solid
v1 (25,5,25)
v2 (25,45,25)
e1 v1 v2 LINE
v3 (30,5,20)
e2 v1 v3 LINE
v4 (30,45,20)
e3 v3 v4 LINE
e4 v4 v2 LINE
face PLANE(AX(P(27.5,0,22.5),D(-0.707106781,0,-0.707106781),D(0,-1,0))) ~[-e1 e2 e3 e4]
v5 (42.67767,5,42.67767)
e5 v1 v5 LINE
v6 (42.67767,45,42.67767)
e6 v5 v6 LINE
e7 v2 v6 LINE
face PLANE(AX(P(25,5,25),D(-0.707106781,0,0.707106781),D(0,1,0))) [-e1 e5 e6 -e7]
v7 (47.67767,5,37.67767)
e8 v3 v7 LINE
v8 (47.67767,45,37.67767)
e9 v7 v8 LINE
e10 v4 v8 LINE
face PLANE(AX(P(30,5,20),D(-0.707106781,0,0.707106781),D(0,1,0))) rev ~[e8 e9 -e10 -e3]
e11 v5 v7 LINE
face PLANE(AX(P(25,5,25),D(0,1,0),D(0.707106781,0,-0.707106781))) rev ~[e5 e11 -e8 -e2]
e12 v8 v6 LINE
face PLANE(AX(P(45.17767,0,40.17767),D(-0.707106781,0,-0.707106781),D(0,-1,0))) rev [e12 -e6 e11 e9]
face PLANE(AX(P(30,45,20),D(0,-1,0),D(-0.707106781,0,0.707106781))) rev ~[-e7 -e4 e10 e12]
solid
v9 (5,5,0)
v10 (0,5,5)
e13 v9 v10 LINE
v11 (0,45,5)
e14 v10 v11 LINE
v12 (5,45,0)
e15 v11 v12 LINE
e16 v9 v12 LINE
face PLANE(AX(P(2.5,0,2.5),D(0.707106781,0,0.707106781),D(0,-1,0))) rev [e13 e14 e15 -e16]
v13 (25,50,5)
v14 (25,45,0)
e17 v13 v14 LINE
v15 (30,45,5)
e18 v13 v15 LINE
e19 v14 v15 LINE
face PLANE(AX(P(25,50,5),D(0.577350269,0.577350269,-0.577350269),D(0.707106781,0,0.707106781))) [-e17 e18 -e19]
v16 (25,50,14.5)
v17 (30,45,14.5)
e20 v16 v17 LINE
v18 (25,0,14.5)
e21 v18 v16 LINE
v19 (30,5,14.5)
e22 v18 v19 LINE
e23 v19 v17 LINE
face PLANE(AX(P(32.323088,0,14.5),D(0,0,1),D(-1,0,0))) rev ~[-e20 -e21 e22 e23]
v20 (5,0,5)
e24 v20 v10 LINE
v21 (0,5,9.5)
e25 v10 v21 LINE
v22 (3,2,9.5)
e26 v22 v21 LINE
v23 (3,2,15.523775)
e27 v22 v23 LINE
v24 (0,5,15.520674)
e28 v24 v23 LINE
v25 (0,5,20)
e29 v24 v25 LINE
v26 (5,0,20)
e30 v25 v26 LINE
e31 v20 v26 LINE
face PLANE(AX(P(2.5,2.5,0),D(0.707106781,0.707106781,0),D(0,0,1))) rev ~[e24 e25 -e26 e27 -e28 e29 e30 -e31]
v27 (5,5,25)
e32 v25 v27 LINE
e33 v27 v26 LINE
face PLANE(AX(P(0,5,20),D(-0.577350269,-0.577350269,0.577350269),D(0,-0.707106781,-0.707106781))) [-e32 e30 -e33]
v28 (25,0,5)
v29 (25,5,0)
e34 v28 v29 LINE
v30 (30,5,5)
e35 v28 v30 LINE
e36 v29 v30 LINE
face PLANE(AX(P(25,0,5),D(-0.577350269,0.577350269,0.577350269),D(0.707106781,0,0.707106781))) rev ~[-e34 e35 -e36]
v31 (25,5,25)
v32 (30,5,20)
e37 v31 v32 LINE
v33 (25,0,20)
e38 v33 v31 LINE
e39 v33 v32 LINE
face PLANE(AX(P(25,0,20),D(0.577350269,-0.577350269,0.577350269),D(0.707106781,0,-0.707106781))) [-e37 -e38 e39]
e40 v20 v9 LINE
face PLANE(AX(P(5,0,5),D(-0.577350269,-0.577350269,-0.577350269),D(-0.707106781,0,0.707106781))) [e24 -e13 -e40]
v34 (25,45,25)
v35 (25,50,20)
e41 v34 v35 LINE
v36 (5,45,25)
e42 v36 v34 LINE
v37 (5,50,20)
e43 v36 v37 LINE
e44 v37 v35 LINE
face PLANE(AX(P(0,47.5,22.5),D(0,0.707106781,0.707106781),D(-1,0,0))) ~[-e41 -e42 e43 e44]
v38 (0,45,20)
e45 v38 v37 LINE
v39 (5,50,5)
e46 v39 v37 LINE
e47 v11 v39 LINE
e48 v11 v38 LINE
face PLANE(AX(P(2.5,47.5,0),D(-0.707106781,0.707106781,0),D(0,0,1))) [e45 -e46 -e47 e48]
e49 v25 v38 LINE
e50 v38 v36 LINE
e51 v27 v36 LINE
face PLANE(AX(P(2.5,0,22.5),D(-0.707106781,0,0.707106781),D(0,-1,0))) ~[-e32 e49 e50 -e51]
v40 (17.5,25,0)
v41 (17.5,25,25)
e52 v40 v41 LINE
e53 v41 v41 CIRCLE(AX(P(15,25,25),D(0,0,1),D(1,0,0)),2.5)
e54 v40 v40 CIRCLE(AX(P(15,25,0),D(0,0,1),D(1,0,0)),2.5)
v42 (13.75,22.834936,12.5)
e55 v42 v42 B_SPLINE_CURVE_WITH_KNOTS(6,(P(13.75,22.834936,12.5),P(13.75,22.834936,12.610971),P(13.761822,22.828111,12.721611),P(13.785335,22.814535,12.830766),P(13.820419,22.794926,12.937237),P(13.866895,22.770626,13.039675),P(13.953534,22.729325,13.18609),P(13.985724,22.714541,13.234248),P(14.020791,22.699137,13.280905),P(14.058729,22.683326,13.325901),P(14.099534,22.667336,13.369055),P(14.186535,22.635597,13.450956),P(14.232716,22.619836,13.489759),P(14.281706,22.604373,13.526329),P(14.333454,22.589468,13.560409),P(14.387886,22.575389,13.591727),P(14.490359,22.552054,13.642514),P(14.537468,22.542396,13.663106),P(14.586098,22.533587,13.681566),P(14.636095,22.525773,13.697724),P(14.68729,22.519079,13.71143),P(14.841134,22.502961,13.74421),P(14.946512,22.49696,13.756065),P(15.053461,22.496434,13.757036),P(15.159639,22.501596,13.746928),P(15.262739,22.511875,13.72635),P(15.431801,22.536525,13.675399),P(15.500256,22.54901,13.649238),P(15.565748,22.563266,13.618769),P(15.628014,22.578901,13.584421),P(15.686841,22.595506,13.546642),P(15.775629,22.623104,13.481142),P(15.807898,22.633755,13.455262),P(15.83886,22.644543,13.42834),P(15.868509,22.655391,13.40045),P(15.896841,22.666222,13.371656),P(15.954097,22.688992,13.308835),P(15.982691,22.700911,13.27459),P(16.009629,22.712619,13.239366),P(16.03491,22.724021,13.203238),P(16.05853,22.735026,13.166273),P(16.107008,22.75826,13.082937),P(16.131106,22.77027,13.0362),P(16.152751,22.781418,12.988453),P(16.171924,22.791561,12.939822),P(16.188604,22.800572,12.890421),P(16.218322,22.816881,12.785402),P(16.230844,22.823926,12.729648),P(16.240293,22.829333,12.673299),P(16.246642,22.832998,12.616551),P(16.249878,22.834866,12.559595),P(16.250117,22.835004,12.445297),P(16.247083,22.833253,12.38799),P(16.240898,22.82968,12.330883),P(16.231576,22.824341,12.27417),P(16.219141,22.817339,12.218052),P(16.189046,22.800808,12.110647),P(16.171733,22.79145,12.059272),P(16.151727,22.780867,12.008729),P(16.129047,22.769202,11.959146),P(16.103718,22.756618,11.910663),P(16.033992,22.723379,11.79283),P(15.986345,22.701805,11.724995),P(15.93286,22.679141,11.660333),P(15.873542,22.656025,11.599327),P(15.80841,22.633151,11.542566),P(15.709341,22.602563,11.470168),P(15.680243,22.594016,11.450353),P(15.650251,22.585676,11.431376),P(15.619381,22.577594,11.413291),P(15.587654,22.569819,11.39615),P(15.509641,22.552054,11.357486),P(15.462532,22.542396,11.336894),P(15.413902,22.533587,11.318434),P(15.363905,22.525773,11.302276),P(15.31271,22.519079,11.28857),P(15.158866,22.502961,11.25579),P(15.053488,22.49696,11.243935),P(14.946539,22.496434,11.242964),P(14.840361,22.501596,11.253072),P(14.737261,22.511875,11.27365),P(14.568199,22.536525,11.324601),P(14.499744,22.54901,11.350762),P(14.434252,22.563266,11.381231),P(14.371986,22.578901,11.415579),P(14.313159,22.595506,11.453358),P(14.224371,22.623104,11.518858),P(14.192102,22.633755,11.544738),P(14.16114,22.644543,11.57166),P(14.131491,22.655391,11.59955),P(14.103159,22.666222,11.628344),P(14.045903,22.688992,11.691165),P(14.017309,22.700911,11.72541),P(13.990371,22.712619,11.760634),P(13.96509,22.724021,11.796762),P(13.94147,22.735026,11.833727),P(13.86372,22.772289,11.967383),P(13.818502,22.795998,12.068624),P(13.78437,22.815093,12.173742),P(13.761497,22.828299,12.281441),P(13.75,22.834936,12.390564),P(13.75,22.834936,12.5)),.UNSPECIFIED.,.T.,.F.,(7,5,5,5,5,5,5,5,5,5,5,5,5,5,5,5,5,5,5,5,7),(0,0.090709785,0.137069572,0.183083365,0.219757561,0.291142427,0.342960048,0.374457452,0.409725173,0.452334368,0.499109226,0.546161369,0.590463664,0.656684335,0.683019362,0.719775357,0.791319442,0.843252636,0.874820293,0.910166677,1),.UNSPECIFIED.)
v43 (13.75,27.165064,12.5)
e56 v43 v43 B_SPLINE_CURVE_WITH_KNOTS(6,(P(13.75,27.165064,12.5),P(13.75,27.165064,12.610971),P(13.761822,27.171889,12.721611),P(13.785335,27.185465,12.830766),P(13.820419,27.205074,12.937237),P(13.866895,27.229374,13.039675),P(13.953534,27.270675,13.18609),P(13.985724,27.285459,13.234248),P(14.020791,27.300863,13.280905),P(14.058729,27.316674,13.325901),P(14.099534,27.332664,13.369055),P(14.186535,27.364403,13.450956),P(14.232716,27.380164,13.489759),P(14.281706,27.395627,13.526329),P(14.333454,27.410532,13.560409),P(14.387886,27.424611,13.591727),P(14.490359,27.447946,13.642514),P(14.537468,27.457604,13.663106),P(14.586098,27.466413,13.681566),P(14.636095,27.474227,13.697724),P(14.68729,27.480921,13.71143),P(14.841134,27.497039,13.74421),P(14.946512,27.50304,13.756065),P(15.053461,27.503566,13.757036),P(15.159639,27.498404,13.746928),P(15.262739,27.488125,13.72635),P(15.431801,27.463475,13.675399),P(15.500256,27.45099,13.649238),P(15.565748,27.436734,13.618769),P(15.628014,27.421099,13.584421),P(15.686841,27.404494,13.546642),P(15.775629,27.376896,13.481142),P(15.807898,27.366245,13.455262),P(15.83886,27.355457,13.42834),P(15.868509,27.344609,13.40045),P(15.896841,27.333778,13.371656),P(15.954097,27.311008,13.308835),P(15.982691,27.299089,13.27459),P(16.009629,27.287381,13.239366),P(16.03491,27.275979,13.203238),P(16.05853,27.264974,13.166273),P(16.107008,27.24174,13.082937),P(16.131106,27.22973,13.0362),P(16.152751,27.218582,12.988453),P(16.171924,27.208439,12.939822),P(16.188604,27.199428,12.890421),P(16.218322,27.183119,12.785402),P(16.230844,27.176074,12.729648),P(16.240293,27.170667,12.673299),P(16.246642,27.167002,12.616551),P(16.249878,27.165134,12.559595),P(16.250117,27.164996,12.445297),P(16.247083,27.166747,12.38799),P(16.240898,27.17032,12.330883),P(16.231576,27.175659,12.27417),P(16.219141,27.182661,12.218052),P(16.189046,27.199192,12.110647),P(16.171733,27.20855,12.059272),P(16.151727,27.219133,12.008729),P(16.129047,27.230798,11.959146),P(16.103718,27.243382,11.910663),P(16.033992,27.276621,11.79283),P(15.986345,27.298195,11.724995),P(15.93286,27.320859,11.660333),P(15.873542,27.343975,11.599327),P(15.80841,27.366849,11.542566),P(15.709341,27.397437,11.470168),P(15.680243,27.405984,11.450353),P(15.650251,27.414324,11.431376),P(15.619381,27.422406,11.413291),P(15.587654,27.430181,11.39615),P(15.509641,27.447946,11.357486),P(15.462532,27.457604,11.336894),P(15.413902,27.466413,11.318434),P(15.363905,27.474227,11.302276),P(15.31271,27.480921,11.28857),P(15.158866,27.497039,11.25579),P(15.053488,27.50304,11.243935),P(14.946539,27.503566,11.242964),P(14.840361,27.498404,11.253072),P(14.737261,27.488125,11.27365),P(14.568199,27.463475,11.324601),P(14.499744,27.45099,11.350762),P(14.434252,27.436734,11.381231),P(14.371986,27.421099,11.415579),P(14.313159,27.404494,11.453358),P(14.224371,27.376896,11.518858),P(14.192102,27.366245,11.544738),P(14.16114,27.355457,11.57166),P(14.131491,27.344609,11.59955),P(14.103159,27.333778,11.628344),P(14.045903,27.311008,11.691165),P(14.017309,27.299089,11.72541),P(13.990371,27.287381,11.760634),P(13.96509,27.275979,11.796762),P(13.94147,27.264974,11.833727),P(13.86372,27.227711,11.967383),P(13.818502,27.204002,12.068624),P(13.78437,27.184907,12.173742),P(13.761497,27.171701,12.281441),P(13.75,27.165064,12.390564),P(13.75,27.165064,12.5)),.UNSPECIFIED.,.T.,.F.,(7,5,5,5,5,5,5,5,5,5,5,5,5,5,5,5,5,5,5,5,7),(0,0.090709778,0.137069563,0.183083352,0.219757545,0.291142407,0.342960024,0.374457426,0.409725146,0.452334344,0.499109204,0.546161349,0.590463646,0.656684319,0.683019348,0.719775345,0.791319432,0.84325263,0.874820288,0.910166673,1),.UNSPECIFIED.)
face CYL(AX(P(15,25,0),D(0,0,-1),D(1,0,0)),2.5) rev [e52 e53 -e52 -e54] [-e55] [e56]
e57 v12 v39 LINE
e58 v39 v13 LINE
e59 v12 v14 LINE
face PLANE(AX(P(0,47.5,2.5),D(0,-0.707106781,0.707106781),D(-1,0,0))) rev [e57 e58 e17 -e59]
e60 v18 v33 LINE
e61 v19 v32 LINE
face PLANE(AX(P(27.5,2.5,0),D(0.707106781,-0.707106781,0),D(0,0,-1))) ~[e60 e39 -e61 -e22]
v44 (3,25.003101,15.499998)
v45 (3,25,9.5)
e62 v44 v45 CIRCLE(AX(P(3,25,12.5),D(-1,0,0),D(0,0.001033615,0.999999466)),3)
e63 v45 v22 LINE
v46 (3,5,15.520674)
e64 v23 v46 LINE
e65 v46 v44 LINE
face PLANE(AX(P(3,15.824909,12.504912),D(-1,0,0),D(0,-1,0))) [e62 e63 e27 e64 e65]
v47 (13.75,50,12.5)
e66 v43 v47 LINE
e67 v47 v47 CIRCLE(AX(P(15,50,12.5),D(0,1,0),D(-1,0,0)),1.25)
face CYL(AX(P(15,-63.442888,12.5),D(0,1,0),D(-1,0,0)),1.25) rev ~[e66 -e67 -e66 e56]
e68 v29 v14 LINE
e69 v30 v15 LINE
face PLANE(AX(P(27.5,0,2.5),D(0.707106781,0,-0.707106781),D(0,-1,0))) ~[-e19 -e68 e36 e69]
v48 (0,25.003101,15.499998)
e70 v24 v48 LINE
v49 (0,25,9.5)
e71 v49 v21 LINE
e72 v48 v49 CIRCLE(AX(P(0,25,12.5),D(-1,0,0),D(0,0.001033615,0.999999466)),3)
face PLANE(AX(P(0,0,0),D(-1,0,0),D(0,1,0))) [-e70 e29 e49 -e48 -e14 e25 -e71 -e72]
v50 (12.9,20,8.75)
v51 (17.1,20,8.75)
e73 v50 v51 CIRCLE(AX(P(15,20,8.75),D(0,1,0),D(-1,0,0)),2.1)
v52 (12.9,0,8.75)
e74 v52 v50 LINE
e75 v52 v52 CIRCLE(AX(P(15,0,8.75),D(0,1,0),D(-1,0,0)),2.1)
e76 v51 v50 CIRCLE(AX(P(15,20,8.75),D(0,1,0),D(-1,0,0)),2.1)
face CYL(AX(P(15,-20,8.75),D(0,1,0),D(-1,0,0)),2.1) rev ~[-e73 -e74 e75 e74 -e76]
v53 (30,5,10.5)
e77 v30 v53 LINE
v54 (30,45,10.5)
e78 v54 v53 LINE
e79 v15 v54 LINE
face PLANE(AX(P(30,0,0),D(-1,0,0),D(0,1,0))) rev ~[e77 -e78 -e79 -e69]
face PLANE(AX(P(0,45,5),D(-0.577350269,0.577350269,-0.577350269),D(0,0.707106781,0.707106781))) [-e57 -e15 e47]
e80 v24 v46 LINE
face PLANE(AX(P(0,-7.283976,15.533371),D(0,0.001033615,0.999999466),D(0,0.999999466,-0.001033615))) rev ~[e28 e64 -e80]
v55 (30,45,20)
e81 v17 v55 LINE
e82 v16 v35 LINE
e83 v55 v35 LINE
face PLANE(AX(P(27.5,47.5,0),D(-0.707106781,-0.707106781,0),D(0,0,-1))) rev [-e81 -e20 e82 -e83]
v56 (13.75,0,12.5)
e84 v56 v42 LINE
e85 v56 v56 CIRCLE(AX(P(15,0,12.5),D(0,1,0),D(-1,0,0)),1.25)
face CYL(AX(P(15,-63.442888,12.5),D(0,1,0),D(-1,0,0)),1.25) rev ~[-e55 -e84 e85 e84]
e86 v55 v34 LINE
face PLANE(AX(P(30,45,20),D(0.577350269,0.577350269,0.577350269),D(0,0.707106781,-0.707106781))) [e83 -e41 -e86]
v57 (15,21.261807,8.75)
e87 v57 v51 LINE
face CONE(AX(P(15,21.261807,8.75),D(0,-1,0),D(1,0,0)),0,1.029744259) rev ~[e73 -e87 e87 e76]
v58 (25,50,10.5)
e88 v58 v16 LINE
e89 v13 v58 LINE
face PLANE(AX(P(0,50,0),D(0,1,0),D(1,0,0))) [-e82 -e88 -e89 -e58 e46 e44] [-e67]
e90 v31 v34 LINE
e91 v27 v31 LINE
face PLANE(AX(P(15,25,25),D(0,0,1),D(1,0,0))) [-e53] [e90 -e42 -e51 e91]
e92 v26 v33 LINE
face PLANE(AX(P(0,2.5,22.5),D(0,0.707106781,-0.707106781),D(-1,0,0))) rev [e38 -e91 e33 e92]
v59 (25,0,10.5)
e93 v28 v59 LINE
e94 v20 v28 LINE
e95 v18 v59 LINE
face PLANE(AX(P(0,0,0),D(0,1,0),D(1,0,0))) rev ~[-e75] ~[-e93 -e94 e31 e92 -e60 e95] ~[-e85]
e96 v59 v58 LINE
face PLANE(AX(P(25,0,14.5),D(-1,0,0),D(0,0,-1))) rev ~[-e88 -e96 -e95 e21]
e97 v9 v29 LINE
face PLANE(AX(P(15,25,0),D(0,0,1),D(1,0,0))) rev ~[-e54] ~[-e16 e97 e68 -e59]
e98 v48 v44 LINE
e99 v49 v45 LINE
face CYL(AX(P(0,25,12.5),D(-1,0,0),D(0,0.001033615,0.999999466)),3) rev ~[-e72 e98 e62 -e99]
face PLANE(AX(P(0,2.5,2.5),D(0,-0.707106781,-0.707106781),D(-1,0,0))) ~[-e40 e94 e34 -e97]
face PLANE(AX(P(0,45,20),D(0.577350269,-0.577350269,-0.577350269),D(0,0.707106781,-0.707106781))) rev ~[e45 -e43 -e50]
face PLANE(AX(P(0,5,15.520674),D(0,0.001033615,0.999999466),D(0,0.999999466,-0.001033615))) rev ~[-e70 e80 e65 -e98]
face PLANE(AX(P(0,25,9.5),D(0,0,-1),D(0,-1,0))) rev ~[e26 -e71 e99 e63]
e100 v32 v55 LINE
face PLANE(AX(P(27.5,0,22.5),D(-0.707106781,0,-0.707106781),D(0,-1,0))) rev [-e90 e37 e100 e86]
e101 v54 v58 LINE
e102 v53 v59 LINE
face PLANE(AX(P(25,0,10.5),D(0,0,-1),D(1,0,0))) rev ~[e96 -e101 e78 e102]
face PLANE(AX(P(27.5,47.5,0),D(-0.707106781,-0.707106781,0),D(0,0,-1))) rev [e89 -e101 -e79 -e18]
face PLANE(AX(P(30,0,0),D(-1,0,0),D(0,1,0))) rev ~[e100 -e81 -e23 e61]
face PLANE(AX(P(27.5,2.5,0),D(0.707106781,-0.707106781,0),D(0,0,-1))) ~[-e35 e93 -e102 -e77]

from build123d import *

# Parameters (mm, degrees)
F0_W     = 30
F0_H     = 50
F0_R     = 2.5
F1_DEPTH = 25
F2_SIZE  = 5
F4_DEPTH = 63.1
F6_DEPTH = 3
F8_D     = 4.2
F8_DEPTH = 20
F8_TIP   = 1.2618073
F9_DEPTH = 25
F11_D    = 2.5


with BuildPart() as f1:
    # F0 (on Top) → F1 (new body)
    with BuildSketch(Plane.XY):
        with Locations((15, 25)):
            Rectangle(F0_W, F0_H)
        with Locations((15, 25)):
            Circle(F0_R, mode=Mode.SUBTRACT)
    extrude(amount=F1_DEPTH)

    # F2
    f2_edges = [f1.edges().sort_by_distance(p)[0] for p in [
        (15, 50, 25),
        (30, 25, 25),
        (15, 0, 25),
        (0, 25, 25),
        (30, 25, 0),
        (15, 50, 0),
        (0, 25, 0),
        (15, 0, 0),
        (0, 0, 12.5),
        (30, 0, 12.5),
        (30, 50, 12.5),
        (0, 50, 12.5),
    ]]
    chamfer(f2_edges, length=F2_SIZE)

    # F3 (on face) → F4 (cut)
    with BuildSketch(Plane.XZ):
        Polygon((25, 14.5), (25, 12.5), (25, 10.5), (32.3230884969, 10.5), (32.3230884969, 14.5), align=None)
    extrude(amount=-F4_DEPTH, mode=Mode.SUBTRACT)

    # F5 (on face) → F6 (cut)
    with BuildSketch(Plane(origin=(0, 0, 0), x_dir=(0, -1, 0), z_dir=(-1, 0, 0))):
        with BuildLine():
            Line((-5, 15.5206739136), (-25.003100845, 15.4999983975))
            ThreePointArc((-25.003100845, 15.4999983975), (-27.9999995994, 12.4984495773), (-25, 9.5))
            Line((-25, 9.5), (-5, 9.5))
            Line((-5, 9.5), (-5, 15.5206739136))
        make_face()
        Polygon((7.2839763969, 15.5333708226), (-5, 15.5206739136), (-5, 9.5), (7.2839763969, 9.5), align=None)
    extrude(amount=-F6_DEPTH, mode=Mode.SUBTRACT)

    # F8
    with Locations(Plane.XZ):
        with Locations((15, 8.75)):
            Hole(F8_D / 2, depth=F8_DEPTH)
            with Locations((0, 0, -(F8_DEPTH + F8_TIP / 2))):  # 118° drill point
                Cone(0, F8_D / 2, F8_TIP, mode=Mode.SUBTRACT)


with BuildPart() as f9:
    # F9 (new): a face of the model
    f9_faces = [f1.part.faces().sort_by_distance(p)[0] for p in [
        (27.5, 25, 22.5),
    ]]
    extrude(f9_faces, amount=F9_DEPTH)


with BuildPart() as f1_1:
    add(f1.part)

    # F11 (through all)
    with Locations(Plane.XZ):
        with Locations((15, 12.5)):
            Hole(F11_D / 2)


solid = Compound([f9.part, f1_1.part])
